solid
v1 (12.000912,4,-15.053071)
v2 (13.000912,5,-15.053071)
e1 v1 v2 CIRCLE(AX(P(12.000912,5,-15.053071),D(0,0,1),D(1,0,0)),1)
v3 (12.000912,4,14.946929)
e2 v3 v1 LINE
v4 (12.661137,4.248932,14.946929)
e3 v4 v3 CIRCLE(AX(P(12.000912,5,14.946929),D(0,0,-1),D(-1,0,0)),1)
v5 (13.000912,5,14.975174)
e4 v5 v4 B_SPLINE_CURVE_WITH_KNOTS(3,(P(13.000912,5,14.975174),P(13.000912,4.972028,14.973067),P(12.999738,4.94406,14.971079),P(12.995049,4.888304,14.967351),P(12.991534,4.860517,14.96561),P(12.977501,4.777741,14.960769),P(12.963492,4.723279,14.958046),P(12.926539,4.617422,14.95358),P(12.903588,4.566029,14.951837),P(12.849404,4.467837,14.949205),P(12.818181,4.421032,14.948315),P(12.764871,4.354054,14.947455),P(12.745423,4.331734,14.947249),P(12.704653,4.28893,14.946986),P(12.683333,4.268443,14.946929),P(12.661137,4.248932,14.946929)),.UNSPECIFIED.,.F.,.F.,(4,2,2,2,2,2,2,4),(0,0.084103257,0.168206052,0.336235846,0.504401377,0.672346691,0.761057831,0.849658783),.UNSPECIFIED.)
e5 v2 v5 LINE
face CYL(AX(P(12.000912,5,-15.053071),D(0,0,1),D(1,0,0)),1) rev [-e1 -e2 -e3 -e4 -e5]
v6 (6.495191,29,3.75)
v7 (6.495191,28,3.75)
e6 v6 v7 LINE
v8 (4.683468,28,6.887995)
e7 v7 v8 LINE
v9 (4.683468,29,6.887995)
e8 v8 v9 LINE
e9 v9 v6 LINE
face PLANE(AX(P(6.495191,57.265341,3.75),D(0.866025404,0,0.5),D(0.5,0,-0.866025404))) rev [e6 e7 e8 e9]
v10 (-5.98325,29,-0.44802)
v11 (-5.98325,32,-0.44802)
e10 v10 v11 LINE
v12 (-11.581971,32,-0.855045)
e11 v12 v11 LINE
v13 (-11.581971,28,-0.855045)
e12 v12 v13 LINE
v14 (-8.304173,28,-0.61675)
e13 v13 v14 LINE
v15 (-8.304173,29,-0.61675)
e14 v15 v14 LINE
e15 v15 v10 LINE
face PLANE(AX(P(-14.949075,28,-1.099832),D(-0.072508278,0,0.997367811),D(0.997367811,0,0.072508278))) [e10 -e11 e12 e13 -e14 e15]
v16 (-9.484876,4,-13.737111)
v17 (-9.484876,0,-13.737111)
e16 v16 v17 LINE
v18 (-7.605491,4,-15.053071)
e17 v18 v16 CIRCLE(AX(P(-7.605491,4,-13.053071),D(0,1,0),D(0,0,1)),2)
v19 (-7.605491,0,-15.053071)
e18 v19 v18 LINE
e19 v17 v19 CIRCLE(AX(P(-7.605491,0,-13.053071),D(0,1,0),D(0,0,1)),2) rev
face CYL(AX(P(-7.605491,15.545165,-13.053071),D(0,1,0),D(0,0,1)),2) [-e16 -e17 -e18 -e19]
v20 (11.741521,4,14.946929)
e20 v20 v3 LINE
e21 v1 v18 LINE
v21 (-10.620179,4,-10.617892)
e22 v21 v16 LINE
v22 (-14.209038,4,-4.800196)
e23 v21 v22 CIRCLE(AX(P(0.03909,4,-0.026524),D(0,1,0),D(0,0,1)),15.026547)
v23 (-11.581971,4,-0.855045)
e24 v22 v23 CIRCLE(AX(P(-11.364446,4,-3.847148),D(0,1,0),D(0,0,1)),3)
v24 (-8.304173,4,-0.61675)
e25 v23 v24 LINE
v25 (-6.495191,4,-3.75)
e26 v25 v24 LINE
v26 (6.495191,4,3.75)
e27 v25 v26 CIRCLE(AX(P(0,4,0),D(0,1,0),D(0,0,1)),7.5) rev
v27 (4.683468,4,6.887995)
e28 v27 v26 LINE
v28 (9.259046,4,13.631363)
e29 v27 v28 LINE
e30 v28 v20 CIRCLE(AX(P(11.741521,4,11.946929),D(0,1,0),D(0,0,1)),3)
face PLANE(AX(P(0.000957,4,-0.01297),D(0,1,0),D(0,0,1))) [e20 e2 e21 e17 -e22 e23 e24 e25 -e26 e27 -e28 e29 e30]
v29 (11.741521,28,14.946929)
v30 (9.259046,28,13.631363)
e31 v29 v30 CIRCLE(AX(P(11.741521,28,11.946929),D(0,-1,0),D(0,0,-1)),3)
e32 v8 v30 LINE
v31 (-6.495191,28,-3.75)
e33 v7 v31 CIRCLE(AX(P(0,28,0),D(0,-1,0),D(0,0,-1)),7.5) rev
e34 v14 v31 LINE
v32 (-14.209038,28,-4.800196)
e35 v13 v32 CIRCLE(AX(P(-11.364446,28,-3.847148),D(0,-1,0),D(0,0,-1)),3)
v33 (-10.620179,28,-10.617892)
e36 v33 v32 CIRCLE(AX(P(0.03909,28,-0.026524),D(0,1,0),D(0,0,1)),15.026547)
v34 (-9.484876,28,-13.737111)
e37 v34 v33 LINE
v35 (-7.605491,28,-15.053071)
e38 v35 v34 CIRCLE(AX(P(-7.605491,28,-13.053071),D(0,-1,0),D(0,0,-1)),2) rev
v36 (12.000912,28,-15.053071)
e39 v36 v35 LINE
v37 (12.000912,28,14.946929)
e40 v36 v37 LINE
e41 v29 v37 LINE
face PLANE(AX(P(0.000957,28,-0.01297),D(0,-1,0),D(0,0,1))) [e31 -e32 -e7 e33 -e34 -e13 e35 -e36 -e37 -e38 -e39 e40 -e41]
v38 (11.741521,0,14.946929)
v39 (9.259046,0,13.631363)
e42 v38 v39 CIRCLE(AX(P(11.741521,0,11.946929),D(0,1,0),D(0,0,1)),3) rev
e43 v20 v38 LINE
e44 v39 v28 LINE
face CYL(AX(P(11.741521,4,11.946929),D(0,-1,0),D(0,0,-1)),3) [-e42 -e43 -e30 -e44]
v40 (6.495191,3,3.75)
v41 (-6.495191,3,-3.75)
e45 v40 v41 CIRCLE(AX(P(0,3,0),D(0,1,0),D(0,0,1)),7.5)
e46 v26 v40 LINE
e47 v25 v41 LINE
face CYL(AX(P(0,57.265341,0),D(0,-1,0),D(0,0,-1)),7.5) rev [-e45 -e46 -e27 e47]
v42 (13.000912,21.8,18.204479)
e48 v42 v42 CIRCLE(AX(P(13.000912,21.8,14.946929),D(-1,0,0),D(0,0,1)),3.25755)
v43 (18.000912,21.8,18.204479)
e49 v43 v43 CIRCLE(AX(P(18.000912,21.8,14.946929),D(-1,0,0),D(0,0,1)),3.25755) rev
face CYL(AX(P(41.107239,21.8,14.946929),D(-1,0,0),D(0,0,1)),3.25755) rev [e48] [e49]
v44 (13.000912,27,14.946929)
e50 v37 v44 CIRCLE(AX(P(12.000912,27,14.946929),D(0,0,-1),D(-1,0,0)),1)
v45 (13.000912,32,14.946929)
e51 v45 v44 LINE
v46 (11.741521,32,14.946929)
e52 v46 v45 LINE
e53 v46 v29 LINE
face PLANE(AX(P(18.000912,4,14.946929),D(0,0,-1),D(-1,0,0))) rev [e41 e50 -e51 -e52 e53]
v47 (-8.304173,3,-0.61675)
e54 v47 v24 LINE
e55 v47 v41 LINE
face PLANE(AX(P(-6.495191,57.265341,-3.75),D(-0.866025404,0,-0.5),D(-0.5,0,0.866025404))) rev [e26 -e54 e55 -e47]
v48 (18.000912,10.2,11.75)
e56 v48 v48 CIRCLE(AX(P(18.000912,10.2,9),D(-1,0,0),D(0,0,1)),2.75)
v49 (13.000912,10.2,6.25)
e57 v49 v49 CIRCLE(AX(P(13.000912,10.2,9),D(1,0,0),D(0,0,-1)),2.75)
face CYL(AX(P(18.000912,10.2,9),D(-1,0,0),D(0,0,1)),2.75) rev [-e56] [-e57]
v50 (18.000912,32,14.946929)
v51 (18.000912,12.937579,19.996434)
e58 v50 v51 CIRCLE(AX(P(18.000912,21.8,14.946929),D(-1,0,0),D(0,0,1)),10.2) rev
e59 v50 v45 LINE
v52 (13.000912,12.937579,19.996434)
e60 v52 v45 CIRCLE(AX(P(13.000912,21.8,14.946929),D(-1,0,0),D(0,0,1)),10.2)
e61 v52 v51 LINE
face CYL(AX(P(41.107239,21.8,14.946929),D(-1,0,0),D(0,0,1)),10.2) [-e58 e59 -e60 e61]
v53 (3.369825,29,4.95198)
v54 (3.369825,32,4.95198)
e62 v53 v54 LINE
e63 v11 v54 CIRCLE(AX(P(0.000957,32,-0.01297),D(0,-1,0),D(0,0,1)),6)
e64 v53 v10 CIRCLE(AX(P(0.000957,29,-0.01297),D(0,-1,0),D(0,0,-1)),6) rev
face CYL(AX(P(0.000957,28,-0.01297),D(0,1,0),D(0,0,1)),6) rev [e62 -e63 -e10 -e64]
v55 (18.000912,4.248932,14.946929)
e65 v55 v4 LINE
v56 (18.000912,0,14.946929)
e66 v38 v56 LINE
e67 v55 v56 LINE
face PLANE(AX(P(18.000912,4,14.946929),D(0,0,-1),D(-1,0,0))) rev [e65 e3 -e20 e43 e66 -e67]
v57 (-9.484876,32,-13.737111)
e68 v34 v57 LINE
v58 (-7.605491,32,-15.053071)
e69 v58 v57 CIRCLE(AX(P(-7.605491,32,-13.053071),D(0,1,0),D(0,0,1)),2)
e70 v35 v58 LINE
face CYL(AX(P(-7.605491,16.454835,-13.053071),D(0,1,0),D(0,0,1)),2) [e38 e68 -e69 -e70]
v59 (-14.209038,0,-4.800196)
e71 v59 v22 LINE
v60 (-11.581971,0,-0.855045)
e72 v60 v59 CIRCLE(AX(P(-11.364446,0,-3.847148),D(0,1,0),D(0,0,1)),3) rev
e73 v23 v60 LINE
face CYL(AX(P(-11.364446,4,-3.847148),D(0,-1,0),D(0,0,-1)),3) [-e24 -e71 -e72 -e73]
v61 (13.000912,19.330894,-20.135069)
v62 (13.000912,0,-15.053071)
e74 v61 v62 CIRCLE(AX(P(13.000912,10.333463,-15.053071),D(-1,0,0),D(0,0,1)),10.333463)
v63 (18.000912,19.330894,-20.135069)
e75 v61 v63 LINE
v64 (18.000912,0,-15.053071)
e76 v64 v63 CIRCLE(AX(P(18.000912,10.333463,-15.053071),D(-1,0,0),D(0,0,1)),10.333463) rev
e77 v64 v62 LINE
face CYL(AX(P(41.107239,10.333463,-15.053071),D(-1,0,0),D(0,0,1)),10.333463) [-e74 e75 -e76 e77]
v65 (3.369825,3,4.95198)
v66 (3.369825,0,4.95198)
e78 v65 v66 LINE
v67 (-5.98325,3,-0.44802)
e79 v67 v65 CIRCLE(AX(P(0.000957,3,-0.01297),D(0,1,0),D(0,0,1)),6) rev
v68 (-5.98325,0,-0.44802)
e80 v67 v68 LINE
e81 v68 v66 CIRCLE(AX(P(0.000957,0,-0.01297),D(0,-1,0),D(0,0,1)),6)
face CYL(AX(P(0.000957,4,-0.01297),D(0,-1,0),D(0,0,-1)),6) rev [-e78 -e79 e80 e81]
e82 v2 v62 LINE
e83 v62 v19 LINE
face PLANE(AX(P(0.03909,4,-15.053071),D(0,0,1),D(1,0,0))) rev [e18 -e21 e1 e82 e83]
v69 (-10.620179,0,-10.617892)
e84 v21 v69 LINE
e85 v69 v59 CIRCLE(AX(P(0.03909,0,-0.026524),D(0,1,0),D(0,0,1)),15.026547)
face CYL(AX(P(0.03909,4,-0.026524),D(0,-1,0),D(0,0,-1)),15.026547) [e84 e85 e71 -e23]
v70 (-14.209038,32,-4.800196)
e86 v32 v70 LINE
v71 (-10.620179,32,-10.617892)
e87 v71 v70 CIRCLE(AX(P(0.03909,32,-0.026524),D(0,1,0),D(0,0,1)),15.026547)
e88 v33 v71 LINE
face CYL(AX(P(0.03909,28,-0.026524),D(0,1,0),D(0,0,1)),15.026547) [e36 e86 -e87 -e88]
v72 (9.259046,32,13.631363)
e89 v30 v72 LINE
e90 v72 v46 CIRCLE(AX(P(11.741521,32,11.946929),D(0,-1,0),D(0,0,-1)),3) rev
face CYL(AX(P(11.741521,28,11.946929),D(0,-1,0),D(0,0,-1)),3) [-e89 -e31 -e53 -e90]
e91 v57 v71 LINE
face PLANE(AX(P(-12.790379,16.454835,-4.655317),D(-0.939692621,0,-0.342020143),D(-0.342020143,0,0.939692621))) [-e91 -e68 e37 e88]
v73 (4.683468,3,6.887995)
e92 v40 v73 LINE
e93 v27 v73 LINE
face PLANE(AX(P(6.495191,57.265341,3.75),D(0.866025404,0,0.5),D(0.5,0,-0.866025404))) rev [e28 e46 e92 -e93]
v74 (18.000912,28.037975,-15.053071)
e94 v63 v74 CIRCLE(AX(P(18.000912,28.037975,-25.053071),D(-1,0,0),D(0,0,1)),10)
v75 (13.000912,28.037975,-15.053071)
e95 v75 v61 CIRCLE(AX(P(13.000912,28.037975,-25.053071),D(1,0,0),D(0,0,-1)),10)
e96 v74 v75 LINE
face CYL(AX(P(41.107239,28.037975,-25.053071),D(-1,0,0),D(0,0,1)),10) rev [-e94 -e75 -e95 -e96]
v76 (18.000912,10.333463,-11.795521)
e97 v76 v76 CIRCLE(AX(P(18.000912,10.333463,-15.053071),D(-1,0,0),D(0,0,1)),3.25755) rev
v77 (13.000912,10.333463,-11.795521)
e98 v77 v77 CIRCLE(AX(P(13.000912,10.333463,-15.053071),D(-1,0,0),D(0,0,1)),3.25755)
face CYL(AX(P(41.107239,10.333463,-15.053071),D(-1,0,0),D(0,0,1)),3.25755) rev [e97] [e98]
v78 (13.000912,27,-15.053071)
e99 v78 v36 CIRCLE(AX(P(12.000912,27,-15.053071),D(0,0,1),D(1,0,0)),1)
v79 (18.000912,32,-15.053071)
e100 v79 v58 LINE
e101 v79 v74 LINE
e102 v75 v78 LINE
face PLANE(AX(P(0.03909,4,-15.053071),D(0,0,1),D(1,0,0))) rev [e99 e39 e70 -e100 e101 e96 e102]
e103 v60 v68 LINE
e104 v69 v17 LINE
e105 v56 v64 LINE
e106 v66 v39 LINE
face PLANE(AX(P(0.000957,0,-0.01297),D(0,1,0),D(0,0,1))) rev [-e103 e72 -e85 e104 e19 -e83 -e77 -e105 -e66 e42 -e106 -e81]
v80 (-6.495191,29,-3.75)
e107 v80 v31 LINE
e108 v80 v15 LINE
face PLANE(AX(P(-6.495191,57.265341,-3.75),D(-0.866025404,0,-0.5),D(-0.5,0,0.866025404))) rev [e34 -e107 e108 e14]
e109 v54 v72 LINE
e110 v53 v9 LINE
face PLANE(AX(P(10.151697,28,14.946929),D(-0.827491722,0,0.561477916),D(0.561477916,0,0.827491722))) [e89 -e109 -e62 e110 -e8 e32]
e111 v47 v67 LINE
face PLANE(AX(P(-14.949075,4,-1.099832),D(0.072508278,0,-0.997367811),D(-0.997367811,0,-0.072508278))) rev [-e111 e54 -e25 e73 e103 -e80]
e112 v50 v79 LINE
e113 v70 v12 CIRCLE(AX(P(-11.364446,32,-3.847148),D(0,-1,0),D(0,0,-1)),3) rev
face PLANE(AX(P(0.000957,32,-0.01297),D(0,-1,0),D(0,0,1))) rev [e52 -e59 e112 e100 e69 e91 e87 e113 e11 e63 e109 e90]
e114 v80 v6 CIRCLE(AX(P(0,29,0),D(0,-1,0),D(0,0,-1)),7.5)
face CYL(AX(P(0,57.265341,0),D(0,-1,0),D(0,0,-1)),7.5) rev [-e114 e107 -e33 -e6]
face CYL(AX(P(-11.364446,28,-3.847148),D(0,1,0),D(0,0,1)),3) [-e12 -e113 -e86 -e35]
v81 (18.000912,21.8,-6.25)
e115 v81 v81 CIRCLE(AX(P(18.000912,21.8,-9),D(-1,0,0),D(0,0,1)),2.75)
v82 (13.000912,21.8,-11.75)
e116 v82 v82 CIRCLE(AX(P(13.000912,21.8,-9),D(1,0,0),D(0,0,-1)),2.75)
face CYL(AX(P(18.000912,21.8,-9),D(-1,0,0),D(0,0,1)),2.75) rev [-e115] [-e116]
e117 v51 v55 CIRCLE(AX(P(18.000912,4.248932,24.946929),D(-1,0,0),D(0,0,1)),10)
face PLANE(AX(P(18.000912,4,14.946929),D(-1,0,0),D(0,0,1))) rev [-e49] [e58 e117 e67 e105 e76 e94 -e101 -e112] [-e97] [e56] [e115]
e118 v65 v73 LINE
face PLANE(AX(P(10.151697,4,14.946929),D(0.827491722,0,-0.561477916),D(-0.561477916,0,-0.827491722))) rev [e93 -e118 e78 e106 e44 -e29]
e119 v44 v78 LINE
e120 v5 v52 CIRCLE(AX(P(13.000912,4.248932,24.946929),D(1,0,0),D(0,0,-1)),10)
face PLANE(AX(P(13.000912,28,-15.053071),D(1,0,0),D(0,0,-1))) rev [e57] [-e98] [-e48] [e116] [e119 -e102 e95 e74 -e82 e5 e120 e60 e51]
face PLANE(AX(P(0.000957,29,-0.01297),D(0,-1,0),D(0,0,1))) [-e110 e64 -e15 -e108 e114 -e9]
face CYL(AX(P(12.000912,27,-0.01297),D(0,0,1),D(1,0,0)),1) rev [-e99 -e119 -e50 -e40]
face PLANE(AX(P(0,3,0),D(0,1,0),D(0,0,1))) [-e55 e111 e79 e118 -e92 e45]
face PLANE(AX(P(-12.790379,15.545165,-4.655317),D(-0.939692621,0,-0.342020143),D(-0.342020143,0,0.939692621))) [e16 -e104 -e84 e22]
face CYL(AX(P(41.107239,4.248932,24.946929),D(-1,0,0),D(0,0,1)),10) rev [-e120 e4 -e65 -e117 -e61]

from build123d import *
from build123d.topology import SkipClean

# Parameters (mm, degrees)
BOSS_EXTRUDE1_DEPTH     = 4
SKETCH3_W               = 5
SKETCH3_H               = 30
BOSS_EXTRUDE3_DEPTH     = 24
BOSS_EXTRUDE5_DEPTH     = 5
SKETCH7_3_R             = 3.25755
CUT_EXTRUDE3_DEPTH      = 5
FILLET3_R               = 10
CUT_EXTRUDE4_DEPTH      = 25
CUT_EXTRUDE4_DEPTH_BACK = 1
CUT_EXTRUDE5_DEPTH      = 50.494221145
CUT_EXTRUDE5_DEPTH_BACK = 50.494221145
SKETCH9_R               = 2.75
FILLET4_R               = 1
FILLET5_R               = 3
BOSS_EXTRUDE6_DEPTH     = 4
FILLET6_R               = 2
BOSS_EXTRUDE7_DEPTH     = 4


with BuildPart() as part:
    # Sketch2 → Boss-Extrude1 (new body)
    with BuildSketch(Plane(origin=(0, 0, 0), x_dir=(1, 0, 0), z_dir=(0, 1, 0))):
        with BuildLine():
            Line((18.000912404, -14.946929254), (18.000912404, 15.053070746))
            Line((18.000912404, 15.053070746), (0.039090451, 15.053070746))
            ThreePointArc((0.039090451, 15.053070746), (-10.199781301, 11.024824414), (-14.94907539, 1.099832277))
            Line((-14.94907539, 1.099832277), (-5.983249792, 0.448020006))
            ThreePointArc((-5.983249792, 0.448020006), (3.000957071, 5.20912276), (3.369824569, -4.951979994))
            Line((3.369824569, -4.951979994), (10.151696986, -14.946929254))
            Line((10.151696986, -14.946929254), (18.000912404, -14.946929254))
        make_face()
    boss_extrude1 = extrude(amount=BOSS_EXTRUDE1_DEPTH)

    # Sketch3 → Boss-Extrude3 (add)
    with BuildSketch(Plane(origin=(0, 4, 0), x_dir=(1, 0, 0), z_dir=(0, 1, 0))):
        with Locations((15.500912404, 0.053070746)):
            Rectangle(SKETCH3_W, SKETCH3_H)
    extrude(amount=BOSS_EXTRUDE3_DEPTH)

    # Mirror1: Boss-Extrude1 across plane
    add(boss_extrude1.mirror(Plane.ZX.offset(16)))

    # Sketch7 → Boss-Extrude5 (add)
    with BuildSketch(Plane.ZY.offset(-13.000912404)):
        with BuildLine():
            Line((-15.053070746, 0), (-15.053070746, 4))
            Line((-15.053070746, 4), (-15.053070746, 7.075913265))
            ThreePointArc((-15.053070746, 7.075913265), (-18.310620746, 10.333463265), (-15.053070746, 13.591013265))
            Line((-15.053070746, 13.591013265), (-15.053070746, 20.666926531))
            ThreePointArc((-15.053070746, 20.666926531), (-25.386534011, 10.333463265), (-15.053070746, 0))
        make_face()
        with BuildLine():
            ThreePointArc((25.146929254, 21.8), (22.159418422, 29.012489168), (14.946929254, 32))
            Line((14.946929254, 32), (14.946929254, 28))
            Line((14.946929254, 28), (14.946929254, 25.05755))
            ThreePointArc((14.946929254, 25.05755), (17.250364949, 24.103435695), (18.204479254, 21.8))
            ThreePointArc((18.204479254, 21.8), (17.250364949, 19.496564305), (14.946929254, 18.54245))
            Line((14.946929254, 18.54245), (14.946929254, 11.6))
            ThreePointArc((14.946929254, 11.6), (22.159418422, 14.587510832), (25.146929254, 21.8))
        make_face()
        with BuildLine():
            Line((14.946929254, 28), (14.946929254, 32))
            ThreePointArc((14.946929254, 32), (4.746929254, 21.8), (14.946929254, 11.6))
            Line((14.946929254, 11.6), (14.946929254, 18.54245))
            ThreePointArc((14.946929254, 18.54245), (11.689379254, 21.8), (14.946929254, 25.05755))
            Line((14.946929254, 25.05755), (14.946929254, 28))
        make_face()
    extrude(amount=-BOSS_EXTRUDE5_DEPTH)

    # Sketch7<3> → Cut-Extrude3 (cut)
    with SkipClean():  # the faces are left unmerged after this step: merging them gives an invalid solid
        with BuildSketch(Plane.ZY.offset(-13.000912404)):
            with Locations((14.946929254, 21.8)):
                Circle(SKETCH7_3_R)
            with Locations((-15.053070746, 10.333463265)):
                Circle(SKETCH7_3_R)
        extrude(amount=-CUT_EXTRUDE3_DEPTH, mode=Mode.SUBTRACT)

    # Fillet3
    # the kernel refuses this fillet: 10 mm, written as the material it adds along each edge
    with BuildSketch(Plane(origin=(13.000912404, 20.666926531, -15.053070746), x_dir=(0, -0.25425566101904284, -0.9671370424297528), z_dir=(1, 0, 0))) as fillet3_piece_1:
        with BuildLine():
            CenterArc((7.797239676, 9.671370424), FILLET3_R, 194.729484057, 60.541031886)
            Line((-1.874130748, 7.128813814), (0, 0))
            ThreePointArc((0, 0), (2.627341533, 0.339588165), (5.254683066, 0))
        make_face()
    extrude(amount=5)
    with BuildSketch(Plane(origin=(13.000912404, 11.6, 14.946929254), x_dir=(0, -1, 0), z_dir=(1, 0, 0))) as fillet3_piece_2:
        with BuildLine():
            CenterArc((7.351068344, -10), FILLET3_R, 90, 60.326985198)
            ThreePointArc((-1.337579351, -5.04950495), (-0.340063626, -2.611829759), (0, 0))
            Line((0, 0), (7.351068344, 0))
        make_face()
    extrude(amount=5)

    # Sketch8 → Cut-Extrude4 (cut, two sides: drawn at the far end of the back side and taken through both)
    with SkipClean():  # the faces are left unmerged after this step: merging them gives an invalid solid
        with BuildSketch(Plane(origin=(0, 4, 0), x_dir=(1, 0, 0), z_dir=(0, 1, 0)).offset(-CUT_EXTRUDE4_DEPTH_BACK)):
            with BuildLine():
                Line((-7.47930432, 0.556782628), (-5.983249792, 0.448020006))
                ThreePointArc((-5.983249792, 0.448020006), (3.000957071, 5.20912276), (3.369824569, -4.951979994))
                Line((3.369824569, -4.951979994), (4.217763535, -6.201650648))
                ThreePointArc((4.217763535, -6.201650648), (5.494951676, -5.104459431), (6.495190528, -3.75))
                ThreePointArc((6.495190528, -3.75), (7.244443697, -1.941142838), (7.5, 0))
                ThreePointArc((7.5, 0), (1.941142838, 7.244443697), (-6.495190528, 3.75))
                ThreePointArc((-6.495190528, 3.75), (-7.167341617, 2.208894325), (-7.47930432, 0.556782628))
            make_face()
            with BuildLine():
                Line((-8.304173093, 0.616750289), (-7.47930432, 0.556782628))
                ThreePointArc((-7.47930432, 0.556782628), (-7.167341617, 2.208894325), (-6.495190528, 3.75))
                Line((-6.495190528, 3.75), (-8.304173093, 0.616750289))
            make_face()
            with BuildLine():
                ThreePointArc((4.217763535, -6.201650648), (-3.752135014, -6.49395741), (-7.47930432, 0.556782628))
                Line((-7.47930432, 0.556782628), (-8.304173093, 0.616750289))
                Line((-8.304173093, 0.616750289), (-11.199802547, -4.398627047))
                Line((-11.199802547, -4.398627047), (1.534433746, -12.342282792))
                Line((1.534433746, -12.342282792), (4.683468483, -6.887994631))
                Line((4.683468483, -6.887994631), (4.217763535, -6.201650648))
            make_face()
            with BuildLine():
                ThreePointArc((6.495190528, -3.75), (5.494951676, -5.104459431), (4.217763535, -6.201650648))
                Line((4.217763535, -6.201650648), (4.683468483, -6.887994631))
                Line((4.683468483, -6.887994631), (6.495190528, -3.75))
            make_face()
            with BuildLine():
                Line((3.369824569, -4.951979994), (-5.983249792, 0.448020006))
                Line((-5.983249792, 0.448020006), (-7.47930432, 0.556782628))
                ThreePointArc((-7.47930432, 0.556782628), (-3.752135014, -6.49395741), (4.217763535, -6.201650648))
                Line((4.217763535, -6.201650648), (3.369824569, -4.951979994))
            make_face()
        extrude(amount=CUT_EXTRUDE4_DEPTH + CUT_EXTRUDE4_DEPTH_BACK, mode=Mode.SUBTRACT)

    # Sketch9 → Cut-Extrude5 (cut, two sides: drawn at the far end of the back side and taken through both)
    with BuildSketch(Plane.ZY.offset(-13.000912404).offset(-CUT_EXTRUDE5_DEPTH_BACK)):
        with Locations((9, 10.2)):
            Circle(SKETCH9_R)
        with Locations((-9, 21.8)):
            Circle(SKETCH9_R)
    extrude(amount=CUT_EXTRUDE5_DEPTH + CUT_EXTRUDE5_DEPTH_BACK, mode=Mode.SUBTRACT)

    # Fillet4
    fillet4_edges = [part.edges().sort_by_distance(p)[0] for p in [
        (13.000912404, 4, -0.053070746),
        (13.000912404, 28, -0.053070746),
    ]]
    fillet(fillet4_edges, radius=FILLET4_R)

    # Fillet5
    fillet5_edges = [part.edges().sort_by_distance(p)[0] for p in [
        (10.151696986, 2, 14.946929254),
        (-14.94907539, 2, -1.099832277),
        (10.151696986, 30, 14.946929254),
        (-14.94907539, 30, -1.099832277),
    ]]
    fillet(fillet5_edges, radius=FILLET5_R)

    # Sketch10 → Boss-Extrude6 (add)
    with BuildSketch(Plane.XZ):
        with BuildLine():
            ThreePointArc((0.039090451, -15.053070746), (-5.733491903, -13.900038334), (-10.620178824, -10.617892431))
            Line((-10.620178824, -10.617892431), (-9.005905934, -15.053070746))
            Line((-9.005905934, -15.053070746), (0.039090451, -15.053070746))
        make_face()
    extrude(amount=-BOSS_EXTRUDE6_DEPTH)

    # Fillet6
    fillet6_edges = [part.edges().sort_by_distance(p)[0] for p in [
        (-9.005905934, 2, -15.053070746),
    ]]
    fillet(fillet6_edges, radius=FILLET6_R)

    # Sketch11 → Boss-Extrude7 (add)
    with BuildSketch(Plane(origin=(0, 32, 0), x_dir=(1, 0, 0), z_dir=(0, 1, 0))):
        with BuildLine():
            Line((-9.484876099, 13.737111032), (-10.620178824, 10.617892431))
            ThreePointArc((-10.620178824, 10.617892431), (-5.733491903, 13.900038334), (0.039090451, 15.053070746))
            Line((0.039090451, 15.053070746), (-7.605490857, 15.053070746))
            ThreePointArc((-7.605490857, 15.053070746), (-8.75264373, 14.691374834), (-9.484876099, 13.737111032))
        make_face()
    extrude(amount=-BOSS_EXTRUDE7_DEPTH)


solid = part.part
